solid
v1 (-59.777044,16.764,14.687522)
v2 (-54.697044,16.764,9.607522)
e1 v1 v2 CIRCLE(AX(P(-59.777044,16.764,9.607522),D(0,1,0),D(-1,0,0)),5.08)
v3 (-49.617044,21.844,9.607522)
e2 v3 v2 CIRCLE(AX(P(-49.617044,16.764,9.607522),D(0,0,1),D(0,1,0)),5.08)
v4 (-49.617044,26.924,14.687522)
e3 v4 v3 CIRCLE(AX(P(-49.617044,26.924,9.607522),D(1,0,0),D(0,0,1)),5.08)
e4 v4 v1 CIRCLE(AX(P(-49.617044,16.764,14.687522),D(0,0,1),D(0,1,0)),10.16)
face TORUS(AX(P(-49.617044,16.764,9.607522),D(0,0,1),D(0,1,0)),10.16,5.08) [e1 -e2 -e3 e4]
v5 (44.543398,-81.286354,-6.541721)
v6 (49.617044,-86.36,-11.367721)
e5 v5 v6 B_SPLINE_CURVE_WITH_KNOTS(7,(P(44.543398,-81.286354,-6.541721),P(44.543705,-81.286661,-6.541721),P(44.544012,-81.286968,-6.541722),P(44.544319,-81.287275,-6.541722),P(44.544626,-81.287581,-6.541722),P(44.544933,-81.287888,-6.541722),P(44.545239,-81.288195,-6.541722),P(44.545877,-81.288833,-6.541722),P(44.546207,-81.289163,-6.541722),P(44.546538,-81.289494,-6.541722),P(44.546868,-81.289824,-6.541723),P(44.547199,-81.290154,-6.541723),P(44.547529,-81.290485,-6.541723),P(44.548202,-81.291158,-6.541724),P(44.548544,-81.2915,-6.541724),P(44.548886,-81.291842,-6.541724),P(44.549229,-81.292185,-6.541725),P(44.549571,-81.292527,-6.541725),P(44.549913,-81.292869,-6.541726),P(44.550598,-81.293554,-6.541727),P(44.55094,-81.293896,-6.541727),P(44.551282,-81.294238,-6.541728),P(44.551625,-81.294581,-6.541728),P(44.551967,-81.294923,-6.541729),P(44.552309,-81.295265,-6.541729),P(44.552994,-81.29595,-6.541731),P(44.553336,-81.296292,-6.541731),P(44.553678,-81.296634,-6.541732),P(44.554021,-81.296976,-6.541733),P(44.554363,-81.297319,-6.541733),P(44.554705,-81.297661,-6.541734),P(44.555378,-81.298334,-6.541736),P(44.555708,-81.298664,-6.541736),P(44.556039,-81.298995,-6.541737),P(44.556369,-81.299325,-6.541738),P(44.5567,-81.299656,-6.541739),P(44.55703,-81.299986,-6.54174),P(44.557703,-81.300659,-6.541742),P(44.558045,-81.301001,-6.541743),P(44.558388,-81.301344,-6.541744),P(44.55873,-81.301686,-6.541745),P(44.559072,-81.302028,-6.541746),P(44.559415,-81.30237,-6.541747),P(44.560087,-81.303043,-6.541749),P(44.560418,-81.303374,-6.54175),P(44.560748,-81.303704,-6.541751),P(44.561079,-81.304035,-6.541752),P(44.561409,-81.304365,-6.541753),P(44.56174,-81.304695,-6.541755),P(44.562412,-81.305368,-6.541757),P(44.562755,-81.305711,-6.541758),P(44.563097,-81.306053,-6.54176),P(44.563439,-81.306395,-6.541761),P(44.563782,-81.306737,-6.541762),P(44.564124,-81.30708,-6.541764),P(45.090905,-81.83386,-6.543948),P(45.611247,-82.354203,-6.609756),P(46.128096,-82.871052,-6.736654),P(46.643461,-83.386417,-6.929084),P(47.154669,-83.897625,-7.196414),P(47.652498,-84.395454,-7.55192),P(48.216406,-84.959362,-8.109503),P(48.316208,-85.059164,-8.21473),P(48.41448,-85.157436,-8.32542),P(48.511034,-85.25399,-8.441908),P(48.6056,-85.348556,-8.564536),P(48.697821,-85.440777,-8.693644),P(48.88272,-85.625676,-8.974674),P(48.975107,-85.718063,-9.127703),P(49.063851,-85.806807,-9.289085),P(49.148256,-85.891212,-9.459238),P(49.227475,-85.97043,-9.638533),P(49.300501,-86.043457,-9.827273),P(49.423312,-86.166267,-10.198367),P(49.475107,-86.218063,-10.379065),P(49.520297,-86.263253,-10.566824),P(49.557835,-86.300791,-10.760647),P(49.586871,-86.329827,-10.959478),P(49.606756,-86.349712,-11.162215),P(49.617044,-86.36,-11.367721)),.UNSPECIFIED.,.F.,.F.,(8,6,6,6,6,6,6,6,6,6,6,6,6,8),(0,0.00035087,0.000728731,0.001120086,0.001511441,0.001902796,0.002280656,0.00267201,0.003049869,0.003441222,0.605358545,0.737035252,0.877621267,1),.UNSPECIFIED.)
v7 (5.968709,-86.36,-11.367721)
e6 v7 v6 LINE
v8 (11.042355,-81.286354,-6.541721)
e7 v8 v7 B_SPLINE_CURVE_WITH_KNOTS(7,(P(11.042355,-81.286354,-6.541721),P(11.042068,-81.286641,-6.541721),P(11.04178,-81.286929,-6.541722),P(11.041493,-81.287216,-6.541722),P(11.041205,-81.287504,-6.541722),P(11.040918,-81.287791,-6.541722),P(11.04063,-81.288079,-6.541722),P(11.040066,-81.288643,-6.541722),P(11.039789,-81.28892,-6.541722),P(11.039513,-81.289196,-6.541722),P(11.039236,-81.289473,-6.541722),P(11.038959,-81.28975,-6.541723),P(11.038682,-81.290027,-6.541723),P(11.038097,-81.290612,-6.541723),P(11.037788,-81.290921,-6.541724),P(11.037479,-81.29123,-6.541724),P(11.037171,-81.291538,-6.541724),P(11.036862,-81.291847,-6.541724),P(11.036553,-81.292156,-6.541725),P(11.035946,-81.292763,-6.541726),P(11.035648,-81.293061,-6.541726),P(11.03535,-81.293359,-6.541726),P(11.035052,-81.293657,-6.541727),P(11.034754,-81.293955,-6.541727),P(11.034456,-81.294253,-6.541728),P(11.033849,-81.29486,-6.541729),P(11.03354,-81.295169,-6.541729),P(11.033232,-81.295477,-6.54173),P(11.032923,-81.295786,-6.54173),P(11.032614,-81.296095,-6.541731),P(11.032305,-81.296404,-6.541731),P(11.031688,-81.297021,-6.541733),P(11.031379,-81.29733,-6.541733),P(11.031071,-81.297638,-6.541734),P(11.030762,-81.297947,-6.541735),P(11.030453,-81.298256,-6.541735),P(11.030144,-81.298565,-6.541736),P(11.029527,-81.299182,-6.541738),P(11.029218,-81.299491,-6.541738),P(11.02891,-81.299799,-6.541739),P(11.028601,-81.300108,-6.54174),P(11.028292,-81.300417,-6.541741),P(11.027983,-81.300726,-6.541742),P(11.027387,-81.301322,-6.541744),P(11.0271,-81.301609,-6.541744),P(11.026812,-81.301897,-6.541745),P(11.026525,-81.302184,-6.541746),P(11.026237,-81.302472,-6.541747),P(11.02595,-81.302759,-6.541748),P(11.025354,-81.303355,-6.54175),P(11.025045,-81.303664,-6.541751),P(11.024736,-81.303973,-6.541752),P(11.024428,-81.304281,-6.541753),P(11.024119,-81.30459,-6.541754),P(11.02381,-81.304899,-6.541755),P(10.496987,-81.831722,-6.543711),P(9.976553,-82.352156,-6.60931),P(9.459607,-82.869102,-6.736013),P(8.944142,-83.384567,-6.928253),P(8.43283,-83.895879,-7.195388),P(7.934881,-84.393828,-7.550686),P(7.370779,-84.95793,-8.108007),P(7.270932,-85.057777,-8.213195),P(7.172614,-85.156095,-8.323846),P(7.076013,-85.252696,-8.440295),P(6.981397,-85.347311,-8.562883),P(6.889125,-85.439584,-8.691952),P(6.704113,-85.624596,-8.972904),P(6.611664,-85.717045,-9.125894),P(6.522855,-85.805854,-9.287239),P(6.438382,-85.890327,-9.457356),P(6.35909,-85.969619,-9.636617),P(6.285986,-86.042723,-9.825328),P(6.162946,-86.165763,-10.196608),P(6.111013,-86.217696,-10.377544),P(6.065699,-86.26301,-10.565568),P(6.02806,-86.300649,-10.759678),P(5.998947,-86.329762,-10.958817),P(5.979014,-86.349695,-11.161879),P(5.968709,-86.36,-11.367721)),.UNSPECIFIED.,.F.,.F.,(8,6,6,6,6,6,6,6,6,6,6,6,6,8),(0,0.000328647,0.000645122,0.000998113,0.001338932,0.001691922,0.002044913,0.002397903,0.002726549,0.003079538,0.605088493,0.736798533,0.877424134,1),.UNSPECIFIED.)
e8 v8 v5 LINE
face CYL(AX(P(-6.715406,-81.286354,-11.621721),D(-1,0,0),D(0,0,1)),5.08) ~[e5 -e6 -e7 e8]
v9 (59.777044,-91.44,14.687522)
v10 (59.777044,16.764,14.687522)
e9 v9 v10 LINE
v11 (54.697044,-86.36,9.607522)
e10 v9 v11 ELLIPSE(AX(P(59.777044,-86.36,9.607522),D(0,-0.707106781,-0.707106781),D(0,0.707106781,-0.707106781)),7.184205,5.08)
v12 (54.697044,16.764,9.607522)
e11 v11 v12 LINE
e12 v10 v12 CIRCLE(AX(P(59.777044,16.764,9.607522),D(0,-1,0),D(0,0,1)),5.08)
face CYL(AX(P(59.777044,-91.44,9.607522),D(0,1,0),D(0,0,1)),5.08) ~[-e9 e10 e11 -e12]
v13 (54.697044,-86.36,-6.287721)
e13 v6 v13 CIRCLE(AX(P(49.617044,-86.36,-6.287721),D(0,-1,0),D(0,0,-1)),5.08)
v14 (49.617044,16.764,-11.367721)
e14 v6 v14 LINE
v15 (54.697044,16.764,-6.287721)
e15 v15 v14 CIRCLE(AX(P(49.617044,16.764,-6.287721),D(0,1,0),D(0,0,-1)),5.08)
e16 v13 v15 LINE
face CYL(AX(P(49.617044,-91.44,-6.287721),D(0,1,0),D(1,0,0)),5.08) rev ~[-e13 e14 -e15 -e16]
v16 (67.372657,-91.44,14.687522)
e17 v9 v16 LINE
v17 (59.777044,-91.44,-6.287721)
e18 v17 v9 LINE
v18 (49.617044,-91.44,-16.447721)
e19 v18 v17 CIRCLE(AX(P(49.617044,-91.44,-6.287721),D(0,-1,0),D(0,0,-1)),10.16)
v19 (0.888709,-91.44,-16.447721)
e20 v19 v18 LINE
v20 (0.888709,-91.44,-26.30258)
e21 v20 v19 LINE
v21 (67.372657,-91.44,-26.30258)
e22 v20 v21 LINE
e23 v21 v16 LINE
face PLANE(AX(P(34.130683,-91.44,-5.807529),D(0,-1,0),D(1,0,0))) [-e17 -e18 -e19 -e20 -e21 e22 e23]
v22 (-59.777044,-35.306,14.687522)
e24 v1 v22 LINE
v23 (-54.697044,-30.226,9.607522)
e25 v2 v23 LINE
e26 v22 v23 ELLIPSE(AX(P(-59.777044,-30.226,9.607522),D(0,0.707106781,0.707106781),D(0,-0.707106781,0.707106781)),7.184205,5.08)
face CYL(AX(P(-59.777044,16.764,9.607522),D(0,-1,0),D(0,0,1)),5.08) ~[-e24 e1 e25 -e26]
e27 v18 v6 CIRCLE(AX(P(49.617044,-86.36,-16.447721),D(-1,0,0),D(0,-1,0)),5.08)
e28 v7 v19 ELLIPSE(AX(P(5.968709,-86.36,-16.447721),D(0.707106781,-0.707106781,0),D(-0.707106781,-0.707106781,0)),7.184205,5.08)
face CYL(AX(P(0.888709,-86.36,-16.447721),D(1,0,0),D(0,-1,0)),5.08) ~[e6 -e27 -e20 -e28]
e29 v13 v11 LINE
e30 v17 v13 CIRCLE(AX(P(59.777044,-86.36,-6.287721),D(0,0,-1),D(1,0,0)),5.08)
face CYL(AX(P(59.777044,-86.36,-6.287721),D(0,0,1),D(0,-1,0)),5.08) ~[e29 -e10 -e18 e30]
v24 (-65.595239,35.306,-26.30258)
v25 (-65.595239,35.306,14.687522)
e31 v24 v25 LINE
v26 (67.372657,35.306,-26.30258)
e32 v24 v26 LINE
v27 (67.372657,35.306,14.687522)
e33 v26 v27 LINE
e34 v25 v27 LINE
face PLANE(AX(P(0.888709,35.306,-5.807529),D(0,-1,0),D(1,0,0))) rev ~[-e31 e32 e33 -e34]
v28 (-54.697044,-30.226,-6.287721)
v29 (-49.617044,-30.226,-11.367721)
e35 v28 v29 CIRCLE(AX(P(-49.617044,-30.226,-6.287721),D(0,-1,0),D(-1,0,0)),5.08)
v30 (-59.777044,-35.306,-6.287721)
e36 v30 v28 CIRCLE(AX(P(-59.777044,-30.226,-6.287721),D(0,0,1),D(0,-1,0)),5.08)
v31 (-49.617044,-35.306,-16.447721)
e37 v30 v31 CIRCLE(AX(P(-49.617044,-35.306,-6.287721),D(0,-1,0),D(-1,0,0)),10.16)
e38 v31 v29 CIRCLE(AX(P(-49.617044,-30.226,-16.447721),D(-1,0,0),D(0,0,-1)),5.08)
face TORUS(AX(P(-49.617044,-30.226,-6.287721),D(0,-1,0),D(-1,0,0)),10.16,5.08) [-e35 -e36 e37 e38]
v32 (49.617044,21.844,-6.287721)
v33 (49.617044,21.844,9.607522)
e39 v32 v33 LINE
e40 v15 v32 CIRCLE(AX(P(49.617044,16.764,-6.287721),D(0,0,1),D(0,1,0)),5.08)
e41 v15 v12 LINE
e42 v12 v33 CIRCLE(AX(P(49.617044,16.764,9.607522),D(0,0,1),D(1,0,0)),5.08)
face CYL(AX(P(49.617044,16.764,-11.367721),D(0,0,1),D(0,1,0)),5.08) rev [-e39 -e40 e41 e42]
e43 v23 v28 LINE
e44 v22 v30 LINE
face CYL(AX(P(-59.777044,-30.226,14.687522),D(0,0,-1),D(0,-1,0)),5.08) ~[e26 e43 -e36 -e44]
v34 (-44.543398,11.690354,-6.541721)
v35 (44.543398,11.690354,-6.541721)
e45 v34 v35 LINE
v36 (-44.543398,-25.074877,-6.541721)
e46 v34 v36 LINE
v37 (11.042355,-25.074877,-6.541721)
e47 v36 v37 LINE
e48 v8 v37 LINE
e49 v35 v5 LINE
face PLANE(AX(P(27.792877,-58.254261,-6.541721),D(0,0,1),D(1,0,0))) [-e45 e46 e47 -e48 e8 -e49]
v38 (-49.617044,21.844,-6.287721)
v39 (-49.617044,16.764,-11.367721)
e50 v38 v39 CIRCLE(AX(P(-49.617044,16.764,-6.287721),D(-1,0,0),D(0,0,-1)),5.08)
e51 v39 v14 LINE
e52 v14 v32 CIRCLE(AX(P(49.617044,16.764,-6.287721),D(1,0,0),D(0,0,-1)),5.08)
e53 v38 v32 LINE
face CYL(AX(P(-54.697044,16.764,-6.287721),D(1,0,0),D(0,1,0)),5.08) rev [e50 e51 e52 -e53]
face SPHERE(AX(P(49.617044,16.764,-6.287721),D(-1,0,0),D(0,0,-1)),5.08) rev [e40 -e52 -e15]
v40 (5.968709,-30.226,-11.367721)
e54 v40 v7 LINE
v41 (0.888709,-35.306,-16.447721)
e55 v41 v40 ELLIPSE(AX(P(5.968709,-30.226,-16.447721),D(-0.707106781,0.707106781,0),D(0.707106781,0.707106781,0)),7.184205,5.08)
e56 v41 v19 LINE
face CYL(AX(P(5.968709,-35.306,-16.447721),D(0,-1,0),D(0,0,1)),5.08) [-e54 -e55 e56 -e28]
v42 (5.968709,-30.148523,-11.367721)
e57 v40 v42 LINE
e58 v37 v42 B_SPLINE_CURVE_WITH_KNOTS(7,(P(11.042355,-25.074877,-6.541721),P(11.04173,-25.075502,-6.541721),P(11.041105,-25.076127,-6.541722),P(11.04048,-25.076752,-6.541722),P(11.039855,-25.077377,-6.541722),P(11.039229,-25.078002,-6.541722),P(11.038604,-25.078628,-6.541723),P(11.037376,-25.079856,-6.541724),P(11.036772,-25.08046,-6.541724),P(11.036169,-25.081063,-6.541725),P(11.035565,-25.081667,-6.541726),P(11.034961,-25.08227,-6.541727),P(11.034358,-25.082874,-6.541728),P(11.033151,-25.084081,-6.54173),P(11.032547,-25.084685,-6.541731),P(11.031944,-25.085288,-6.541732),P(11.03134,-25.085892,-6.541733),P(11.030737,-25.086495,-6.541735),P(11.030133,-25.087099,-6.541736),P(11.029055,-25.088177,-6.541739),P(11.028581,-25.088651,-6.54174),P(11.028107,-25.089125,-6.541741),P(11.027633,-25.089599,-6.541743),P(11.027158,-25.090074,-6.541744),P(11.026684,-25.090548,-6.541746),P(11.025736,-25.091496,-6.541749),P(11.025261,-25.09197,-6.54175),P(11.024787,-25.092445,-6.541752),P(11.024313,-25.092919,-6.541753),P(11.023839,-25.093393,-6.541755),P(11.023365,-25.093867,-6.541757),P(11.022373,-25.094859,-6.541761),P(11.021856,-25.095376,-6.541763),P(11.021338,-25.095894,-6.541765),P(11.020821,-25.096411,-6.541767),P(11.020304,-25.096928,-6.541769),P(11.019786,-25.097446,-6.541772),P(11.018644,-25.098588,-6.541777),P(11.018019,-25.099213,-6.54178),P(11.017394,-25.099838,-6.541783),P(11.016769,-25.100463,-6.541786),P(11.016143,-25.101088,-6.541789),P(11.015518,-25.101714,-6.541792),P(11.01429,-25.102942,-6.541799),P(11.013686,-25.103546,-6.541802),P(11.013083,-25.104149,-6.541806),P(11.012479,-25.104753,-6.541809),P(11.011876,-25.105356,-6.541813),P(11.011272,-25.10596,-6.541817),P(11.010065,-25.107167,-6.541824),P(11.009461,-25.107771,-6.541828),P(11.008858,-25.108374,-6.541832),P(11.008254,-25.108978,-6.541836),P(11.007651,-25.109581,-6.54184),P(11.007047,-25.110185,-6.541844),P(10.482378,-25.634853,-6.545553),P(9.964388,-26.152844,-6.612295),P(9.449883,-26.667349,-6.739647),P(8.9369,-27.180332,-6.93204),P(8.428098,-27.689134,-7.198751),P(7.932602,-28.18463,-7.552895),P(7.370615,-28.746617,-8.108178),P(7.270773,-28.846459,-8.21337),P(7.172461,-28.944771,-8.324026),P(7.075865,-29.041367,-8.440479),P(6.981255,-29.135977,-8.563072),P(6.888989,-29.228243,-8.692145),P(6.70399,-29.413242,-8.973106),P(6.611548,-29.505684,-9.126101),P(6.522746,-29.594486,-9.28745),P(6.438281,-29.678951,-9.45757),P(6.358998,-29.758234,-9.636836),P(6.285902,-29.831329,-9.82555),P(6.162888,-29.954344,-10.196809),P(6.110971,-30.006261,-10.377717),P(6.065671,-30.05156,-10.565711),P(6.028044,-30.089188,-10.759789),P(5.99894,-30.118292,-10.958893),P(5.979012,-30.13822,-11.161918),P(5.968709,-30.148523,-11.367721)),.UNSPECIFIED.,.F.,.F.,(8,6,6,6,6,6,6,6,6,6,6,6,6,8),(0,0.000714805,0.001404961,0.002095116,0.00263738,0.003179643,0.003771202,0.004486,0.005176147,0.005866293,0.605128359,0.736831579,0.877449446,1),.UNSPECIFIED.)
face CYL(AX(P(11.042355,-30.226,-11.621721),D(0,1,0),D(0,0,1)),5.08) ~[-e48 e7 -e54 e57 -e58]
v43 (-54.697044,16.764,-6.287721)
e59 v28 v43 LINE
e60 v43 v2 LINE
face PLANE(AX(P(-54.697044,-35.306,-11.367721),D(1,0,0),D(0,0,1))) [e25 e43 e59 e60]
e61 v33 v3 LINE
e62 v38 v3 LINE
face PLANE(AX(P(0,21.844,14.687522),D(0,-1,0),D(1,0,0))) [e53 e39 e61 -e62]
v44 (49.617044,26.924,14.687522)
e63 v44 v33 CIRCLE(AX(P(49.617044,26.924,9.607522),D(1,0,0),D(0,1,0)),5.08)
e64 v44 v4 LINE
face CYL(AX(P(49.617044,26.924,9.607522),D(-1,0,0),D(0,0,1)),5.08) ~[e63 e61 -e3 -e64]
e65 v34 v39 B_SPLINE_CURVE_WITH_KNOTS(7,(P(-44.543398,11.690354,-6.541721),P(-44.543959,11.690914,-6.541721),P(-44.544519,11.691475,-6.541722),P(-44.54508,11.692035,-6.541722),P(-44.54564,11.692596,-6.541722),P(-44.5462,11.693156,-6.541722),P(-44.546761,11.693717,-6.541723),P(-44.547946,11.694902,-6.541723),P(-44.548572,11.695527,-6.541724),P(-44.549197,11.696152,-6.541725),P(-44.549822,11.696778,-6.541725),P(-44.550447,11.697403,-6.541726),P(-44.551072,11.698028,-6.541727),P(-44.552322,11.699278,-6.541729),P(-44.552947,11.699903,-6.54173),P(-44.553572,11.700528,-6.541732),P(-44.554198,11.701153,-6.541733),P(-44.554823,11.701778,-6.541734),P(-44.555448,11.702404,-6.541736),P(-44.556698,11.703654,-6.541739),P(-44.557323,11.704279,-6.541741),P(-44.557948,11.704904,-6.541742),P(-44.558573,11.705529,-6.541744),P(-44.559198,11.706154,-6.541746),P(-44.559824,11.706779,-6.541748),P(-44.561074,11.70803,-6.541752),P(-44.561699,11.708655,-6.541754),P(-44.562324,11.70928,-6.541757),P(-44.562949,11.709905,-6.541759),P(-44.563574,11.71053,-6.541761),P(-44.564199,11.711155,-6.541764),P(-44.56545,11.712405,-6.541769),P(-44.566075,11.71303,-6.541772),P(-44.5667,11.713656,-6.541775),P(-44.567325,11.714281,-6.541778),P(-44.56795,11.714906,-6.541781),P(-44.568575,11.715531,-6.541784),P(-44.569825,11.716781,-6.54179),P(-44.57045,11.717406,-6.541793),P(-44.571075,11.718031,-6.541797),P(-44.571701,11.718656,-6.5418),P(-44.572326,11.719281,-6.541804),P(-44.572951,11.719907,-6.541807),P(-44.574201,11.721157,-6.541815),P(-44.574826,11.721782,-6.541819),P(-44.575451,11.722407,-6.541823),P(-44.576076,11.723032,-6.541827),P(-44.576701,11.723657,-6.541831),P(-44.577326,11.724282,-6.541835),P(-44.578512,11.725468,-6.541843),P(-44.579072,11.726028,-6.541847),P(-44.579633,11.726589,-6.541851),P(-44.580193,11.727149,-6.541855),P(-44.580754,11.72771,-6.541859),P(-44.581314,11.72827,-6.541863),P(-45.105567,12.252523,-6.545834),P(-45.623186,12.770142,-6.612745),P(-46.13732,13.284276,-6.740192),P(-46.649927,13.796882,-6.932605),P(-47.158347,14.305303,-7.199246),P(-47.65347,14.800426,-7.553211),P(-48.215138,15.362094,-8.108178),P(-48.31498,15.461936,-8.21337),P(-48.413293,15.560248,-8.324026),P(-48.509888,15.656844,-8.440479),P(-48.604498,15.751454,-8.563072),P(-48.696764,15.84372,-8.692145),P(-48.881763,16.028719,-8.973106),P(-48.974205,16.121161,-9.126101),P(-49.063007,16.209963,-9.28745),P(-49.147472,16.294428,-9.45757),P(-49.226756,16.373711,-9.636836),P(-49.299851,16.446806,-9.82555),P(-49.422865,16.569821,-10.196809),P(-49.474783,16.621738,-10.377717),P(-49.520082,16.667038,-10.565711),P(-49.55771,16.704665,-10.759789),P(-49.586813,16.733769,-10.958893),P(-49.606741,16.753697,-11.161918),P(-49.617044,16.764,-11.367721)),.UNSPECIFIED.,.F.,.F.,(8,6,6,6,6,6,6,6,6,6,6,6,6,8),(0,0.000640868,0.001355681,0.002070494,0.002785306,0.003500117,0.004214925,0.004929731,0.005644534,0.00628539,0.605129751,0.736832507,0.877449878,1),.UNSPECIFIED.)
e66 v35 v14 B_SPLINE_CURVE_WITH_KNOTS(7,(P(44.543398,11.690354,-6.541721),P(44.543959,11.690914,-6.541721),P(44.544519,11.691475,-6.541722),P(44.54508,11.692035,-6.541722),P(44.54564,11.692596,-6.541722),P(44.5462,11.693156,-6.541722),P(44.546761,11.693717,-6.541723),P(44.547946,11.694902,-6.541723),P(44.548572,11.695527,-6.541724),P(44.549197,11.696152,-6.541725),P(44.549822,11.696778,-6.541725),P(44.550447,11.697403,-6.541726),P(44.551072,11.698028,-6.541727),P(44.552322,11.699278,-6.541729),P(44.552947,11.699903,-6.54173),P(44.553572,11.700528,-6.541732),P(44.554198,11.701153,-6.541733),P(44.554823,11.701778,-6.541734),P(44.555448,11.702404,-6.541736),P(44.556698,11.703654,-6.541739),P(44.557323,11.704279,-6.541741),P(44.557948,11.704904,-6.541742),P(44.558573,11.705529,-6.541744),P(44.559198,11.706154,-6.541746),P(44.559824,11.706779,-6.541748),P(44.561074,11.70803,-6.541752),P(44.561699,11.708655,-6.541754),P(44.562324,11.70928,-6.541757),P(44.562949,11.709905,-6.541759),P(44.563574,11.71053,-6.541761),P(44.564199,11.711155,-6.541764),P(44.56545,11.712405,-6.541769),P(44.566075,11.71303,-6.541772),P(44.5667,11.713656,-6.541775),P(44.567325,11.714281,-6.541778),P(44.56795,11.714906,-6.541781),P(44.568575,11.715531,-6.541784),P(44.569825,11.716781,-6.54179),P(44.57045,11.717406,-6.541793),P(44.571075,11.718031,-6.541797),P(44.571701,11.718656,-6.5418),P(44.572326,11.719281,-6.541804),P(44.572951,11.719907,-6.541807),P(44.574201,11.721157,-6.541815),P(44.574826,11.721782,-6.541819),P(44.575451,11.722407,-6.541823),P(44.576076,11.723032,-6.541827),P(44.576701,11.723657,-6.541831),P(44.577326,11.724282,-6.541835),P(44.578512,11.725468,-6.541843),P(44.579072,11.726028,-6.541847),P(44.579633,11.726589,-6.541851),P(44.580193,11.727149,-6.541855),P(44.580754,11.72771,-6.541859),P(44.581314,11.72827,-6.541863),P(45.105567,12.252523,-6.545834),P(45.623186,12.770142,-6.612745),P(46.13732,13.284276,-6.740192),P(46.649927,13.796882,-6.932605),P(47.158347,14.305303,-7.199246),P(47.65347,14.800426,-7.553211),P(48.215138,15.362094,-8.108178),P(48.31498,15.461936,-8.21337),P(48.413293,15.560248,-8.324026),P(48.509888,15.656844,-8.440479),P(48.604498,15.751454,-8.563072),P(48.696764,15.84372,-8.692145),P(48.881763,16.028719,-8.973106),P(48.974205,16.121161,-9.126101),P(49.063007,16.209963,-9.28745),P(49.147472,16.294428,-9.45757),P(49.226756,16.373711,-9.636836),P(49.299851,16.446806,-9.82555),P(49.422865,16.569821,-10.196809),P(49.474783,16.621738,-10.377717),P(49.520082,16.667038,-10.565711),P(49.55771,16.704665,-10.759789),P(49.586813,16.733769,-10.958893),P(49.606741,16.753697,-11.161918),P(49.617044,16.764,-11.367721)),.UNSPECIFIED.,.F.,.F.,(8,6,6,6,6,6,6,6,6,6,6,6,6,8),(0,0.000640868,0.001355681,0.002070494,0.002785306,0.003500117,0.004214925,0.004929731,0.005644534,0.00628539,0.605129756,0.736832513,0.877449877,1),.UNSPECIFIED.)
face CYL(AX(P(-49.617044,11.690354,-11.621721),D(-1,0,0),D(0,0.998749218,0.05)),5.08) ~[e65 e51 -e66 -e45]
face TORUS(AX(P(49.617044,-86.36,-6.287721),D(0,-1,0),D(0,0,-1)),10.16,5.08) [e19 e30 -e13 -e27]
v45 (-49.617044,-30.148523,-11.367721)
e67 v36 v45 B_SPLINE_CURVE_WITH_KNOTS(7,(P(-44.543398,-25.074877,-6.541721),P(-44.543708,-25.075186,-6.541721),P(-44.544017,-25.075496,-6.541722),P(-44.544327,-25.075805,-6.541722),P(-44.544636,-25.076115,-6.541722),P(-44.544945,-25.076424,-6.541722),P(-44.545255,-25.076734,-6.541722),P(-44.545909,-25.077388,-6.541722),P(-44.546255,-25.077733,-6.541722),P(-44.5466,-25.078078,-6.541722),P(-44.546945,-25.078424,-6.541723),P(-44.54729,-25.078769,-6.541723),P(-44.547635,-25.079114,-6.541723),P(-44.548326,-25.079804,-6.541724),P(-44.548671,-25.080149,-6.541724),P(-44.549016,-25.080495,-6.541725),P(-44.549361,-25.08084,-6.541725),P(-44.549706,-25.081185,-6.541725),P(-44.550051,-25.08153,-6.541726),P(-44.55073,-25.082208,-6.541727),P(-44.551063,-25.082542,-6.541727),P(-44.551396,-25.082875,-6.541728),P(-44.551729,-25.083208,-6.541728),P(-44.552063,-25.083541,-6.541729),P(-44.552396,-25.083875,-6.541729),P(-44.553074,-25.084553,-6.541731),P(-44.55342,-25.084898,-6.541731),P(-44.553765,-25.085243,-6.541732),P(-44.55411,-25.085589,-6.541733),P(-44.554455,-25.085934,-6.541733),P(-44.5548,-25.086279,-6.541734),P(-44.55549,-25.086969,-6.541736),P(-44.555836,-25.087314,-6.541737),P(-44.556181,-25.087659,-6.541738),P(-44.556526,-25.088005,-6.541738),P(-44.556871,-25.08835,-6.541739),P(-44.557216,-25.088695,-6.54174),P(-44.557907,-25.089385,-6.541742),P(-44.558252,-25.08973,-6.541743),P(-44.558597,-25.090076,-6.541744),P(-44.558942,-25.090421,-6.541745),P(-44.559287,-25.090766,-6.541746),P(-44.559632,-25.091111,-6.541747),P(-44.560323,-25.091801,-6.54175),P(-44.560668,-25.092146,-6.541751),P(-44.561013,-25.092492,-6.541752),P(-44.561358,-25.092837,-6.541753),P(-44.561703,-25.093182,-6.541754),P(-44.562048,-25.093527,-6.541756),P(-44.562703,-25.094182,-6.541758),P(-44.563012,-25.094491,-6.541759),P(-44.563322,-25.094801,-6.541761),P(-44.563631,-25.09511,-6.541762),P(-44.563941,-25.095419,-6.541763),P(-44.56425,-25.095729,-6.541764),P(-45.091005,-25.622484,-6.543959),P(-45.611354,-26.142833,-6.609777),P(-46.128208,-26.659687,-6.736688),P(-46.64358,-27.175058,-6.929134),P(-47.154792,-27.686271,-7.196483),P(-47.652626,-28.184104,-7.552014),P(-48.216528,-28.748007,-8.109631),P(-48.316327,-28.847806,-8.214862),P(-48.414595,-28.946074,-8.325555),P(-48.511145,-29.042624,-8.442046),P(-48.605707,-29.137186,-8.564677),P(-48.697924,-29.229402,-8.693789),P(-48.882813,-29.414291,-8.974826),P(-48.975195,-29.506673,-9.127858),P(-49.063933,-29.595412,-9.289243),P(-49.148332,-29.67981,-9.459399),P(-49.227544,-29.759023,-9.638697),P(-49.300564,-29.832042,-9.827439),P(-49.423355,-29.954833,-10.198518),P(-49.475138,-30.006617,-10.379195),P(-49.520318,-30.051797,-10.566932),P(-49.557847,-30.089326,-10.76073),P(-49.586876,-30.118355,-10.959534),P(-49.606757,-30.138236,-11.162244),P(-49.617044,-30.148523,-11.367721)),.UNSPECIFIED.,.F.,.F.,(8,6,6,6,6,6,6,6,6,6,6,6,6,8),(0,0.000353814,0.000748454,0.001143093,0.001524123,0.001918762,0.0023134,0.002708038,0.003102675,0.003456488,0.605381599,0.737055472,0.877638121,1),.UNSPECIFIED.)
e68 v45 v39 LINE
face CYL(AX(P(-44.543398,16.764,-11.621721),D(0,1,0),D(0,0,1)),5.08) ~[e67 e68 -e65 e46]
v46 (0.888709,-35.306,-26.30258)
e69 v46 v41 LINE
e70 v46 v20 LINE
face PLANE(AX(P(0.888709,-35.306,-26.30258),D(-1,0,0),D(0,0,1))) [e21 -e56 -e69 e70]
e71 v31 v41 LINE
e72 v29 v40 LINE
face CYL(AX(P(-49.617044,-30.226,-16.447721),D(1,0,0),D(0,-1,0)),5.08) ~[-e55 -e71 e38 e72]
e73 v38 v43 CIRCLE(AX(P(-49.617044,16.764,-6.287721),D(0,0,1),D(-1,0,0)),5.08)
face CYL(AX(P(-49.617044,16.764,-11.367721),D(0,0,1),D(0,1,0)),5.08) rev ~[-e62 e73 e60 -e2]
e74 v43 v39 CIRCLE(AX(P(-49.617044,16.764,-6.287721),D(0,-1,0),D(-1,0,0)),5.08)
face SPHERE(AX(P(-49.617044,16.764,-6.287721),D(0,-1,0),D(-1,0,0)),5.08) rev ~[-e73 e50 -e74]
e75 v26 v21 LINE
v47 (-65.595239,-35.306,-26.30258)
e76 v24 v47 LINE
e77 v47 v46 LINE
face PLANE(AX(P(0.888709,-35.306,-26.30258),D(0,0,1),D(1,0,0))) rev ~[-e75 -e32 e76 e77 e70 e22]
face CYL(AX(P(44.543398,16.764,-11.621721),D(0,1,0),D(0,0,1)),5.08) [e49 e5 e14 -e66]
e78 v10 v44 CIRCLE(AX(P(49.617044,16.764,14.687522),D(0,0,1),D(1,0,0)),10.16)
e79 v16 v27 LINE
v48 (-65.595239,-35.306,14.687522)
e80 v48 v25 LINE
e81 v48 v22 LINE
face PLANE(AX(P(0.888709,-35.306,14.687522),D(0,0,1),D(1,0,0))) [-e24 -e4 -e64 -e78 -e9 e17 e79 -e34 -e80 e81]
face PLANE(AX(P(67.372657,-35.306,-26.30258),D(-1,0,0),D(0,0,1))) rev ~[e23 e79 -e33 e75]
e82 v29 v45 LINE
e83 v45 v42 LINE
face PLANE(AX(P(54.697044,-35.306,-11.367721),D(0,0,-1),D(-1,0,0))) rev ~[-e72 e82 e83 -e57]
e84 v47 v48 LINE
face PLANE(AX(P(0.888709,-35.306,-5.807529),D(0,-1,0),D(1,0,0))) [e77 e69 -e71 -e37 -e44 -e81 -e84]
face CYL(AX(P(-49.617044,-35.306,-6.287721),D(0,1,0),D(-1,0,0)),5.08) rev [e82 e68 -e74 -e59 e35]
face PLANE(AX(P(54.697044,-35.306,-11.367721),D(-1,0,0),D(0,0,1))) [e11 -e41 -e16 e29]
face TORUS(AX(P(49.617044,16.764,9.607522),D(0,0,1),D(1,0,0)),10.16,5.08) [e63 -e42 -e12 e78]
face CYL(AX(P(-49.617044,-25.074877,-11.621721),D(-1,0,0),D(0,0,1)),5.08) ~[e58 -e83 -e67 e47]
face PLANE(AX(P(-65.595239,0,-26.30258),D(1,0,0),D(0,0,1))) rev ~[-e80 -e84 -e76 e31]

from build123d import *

# Parameters (mm, degrees)
F0_W          = 132.9678967595
F0_H          = 40.9901021048
F1_DEPTH      = 35.306
F2_W          = 109.3940883875
F2_H          = 52.1104875952
F3_DEPTH      = 57.15
F4_W          = 66.4839483798
F4_H          = 40.9901021048
F5_DEPTH      = 56.134
F6_W          = 53.8083352149
F6_H          = 26.0552437976
F7_DEPTH      = 59.69
F8_F1_R       = 5.08
F8_F2_R       = 5.08
F9_W          = 99.2340883875
F9_H          = 46.9125229284
F10_DEPTH     = 4.826
F11_W         = 43.6483352149
F11_H         = 56.2114770716
F12_DEPTH     = 4.826
F13_T1_DEPTH  = 56.3324502806
F13_T3_DEPTH  = 0.0774771487
F13_T5_DEPTH  = 68.8181149887
F13_T7_DEPTH  = 55.5857531726
F13_T9_DEPTH  = 115.8081150657
F13_T11_DEPTH = 99.2340883875
F13_T13_DEPTH = 59.5966379941
F13_T19_DEPTH = 68.2698682383
F13_T23_DEPTH = 12.7615922144


# Not quite as in the source:
# - a fillet or chamfer that OpenCascade refuses, or shapes differently, is made with other operations: its cross-section is extruded or revolved along the edge and cut away or added


with BuildPart() as f1:
    # F0 (on Front) → F1 (new body, symmetric)
    with BuildSketch(Plane.XZ):
        with Locations((0.8887089789, -5.8075287379)):
            Rectangle(F0_W, F0_H)
    extrude(amount=F1_DEPTH, both=True)

    # F2 (on face) → F3 (cut)
    with BuildSketch(Plane.XZ.offset(35.306)):
        with Locations((0, 14.6875223145)):
            Rectangle(F2_W, F2_H)
    extrude(amount=-F3_DEPTH, mode=Mode.SUBTRACT)

    # F4 (on face) → F5 (join)
    with BuildSketch(Plane.XZ.offset(35.306)):
        with Locations((34.1306831688, -5.8075287379)):
            Rectangle(F4_W, F4_H)
    extrude(amount=F5_DEPTH)

    # F6 (on face) → F7 (cut)
    with BuildSketch(Plane(origin=(0, -35.306, 0), x_dir=(-1, 0, 0), z_dir=(0, 1, 0))):
        with Locations((-27.7928765863, 1.6599004157)):
            Rectangle(F6_W, F6_H)
    extrude(amount=-F7_DEPTH, mode=Mode.SUBTRACT)

    # F8: fillet of radius 5.08 on 11 edges, made by hand

    # F8_f1
    f8_f1_edges = [f1.edges().sort_by_distance(p)[0] for p in [
        (-54.6970441937, -6.731, -11.3677214831),
        (-54.6970441937, 21.844, 1.6599004157),
        (0, 21.844, -11.3677214831),
        (54.6970441937, -34.798, -11.3677214831),
        (54.6970441937, 21.844, 1.6599004157),
    ]]
    fillet(f8_f1_edges, radius=F8_F1_R)

    # F8_f2
    f8_f2_edges = [f1.edges().sort_by_distance(p)[0] for p in [
        (-54.6970441937, -9.271, 14.6875223145),
        (0, 21.844, 14.6875223145),
        (54.6970441937, -37.338, 14.6875223145),
        (-24.3641676074, -35.306, -11.3677214831),
        (0.8887089789, -63.373, -11.3677214831),
        (25.2528765863, -91.44, -11.3677214831),
        (53.2091466422, -91.44, -9.8798239315),
        (-53.2091466422, -35.306, -9.8798239315),
        (53.2091466422, 20.3561024484, 14.6875223145),
        (-53.2091466422, 20.3561024484, 14.6875223145),
    ]]
    fillet(f8_f2_edges, radius=F8_F2_R)

    # F9 (on face) → F10 (join)
    with BuildSketch(Plane.XY.offset(-11.3677214831)):
        with Locations((0, -6.6922614642)):
            Rectangle(F9_W, F9_H)
    extrude(amount=F10_DEPTH)

    # F11 (on face) → F12 (join)
    with BuildSketch(Plane.XY.offset(-11.3677214831)):
        with Locations((27.7928765863, -58.2542614642)):
            Rectangle(F11_W, F11_H)
    extrude(amount=F12_DEPTH)

    # F13: fillet of radius 5.08 on 6 edges, made by hand

    # F13_s2 → F13_t1 (cut)
    with BuildSketch(Plane.YZ.offset(-6.7154060868)):
        with BuildLine():
            ThreePointArc((-81.2863539737, -6.5417214831), (-84.7875023567, -7.9409117896), (-86.36, -11.3677214831))
            Line((-86.36, -11.3677214831), (-86.36, -6.5417214831))
            Line((-86.36, -6.5417214831), (-81.2863539737, -6.5417214831))
        make_face()
    extrude(amount=F13_T1_DEPTH, mode=Mode.SUBTRACT)

    # F13_s4 → F13_t3 (cut)
    with BuildSketch(Plane.XZ.offset(30.1485229284)):
        with BuildLine():
            ThreePointArc((11.0423550052, -6.5417214831), (7.5412066221, -7.9409117896), (5.9687089789, -11.3677214831))
            Line((5.9687089789, -11.3677214831), (5.9687089789, -6.5417214831))
            Line((5.9687089789, -6.5417214831), (11.0423550052, -6.5417214831))
        make_face()
    extrude(amount=F13_T3_DEPTH, mode=Mode.SUBTRACT)

    # F13_s6 → F13_t5 (cut)
    with BuildSketch(Plane.XZ.offset(30.226000077)):
        with BuildLine():
            ThreePointArc((11.0423550052, -6.5417214831), (7.5412066221, -7.9409117896), (5.9687089789, -11.3677214831))
            Line((5.9687089789, -11.3677214831), (5.9687089789, -6.5417214831))
            Line((5.9687089789, -6.5417214831), (11.0423550052, -6.5417214831))
        make_face()
    extrude(amount=F13_T5_DEPTH, mode=Mode.SUBTRACT)

    # F13_s8 → F13_t7 (cut)
    with BuildSketch(Plane.YZ.offset(-49.6170441937)):
        with BuildLine():
            ThreePointArc((-25.0748769021, -6.5417214831), (-28.5760252851, -7.9409117896), (-30.1485229284, -11.3677214831))
            Line((-30.1485229284, -11.3677214831), (-30.1485229284, -6.5417214831))
            Line((-30.1485229284, -6.5417214831), (-25.0748769021, -6.5417214831))
        make_face()
    extrude(amount=F13_T7_DEPTH, mode=Mode.SUBTRACT)

    # F13_s10 → F13_t9 (cut)
    with BuildSketch(Plane.XZ.offset(-16.764)):
        with BuildLine():
            ThreePointArc((44.5433981675, -6.5417214831), (48.0445465505, -7.9409117896), (49.6170441937, -11.3677214831))
            Line((49.6170441937, -11.3677214831), (49.6170441937, -6.5417214831))
            Line((49.6170441937, -6.5417214831), (44.5433981675, -6.5417214831))
        make_face()
    extrude(amount=F13_T9_DEPTH, mode=Mode.SUBTRACT)

    # F13_s12 → F13_t11 (cut)
    with BuildSketch(Plane.YZ.offset(-49.6170441937)):
        with BuildLine():
            ThreePointArc((16.764, -11.3677214831), (15.1915023567, -7.9409117896), (11.6903539737, -6.5417214831))
            Line((11.6903539737, -6.5417214831), (16.764, -6.5417214831))
            Line((16.764, -6.5417214831), (16.764, -11.3677214831))
        make_face()
    extrude(amount=F13_T11_DEPTH, mode=Mode.SUBTRACT)

    # F13_s14 → F13_t13 (cut)
    with BuildSketch(Plane.XZ.offset(-16.764)):
        with BuildLine():
            ThreePointArc((-44.5433981675, -6.5417214831), (-48.0445465505, -7.9409117896), (-49.6170441937, -11.3677214831))
            Line((-49.6170441937, -11.3677214831), (-49.6170441937, -6.5417214831))
            Line((-49.6170441937, -6.5417214831), (-44.5433981675, -6.5417214831))
        make_face()
    extrude(amount=F13_T13_DEPTH, mode=Mode.SUBTRACT)


with BuildPart() as f13_tool17:
    # F13_s18 → F13_t19 (new body)
    with BuildSketch(Plane.YZ.offset(-49.6170441937)):
        with BuildLine():
            ThreePointArc((-25.0748769021, -6.5417214831), (-28.5760252851, -7.9409117896), (-30.1485229284, -11.3677214831))
            Line((-30.1485229284, -11.3677214831), (-30.1485229284, -6.5417214831))
            Line((-30.1485229284, -6.5417214831), (-25.0748769021, -6.5417214831))
        make_face()
    extrude(amount=F13_T19_DEPTH)

    split(bisect_by=Plane.YZ.offset(5.9687089789), keep=Keep.TOP)


with BuildPart() as f13_tool21:
    # F13_s22 → F13_t23 (new body)
    with BuildSketch(Plane.XZ.offset(17.4644078627)):
        with BuildLine():
            ThreePointArc((11.0423550052, -6.5417214831), (7.5412066221, -7.9409117896), (5.9687089789, -11.3677214831))
            Line((5.9687089789, -11.3677214831), (5.9687089789, -6.5417214831))
            Line((5.9687089789, -6.5417214831), (11.0423550052, -6.5417214831))
        make_face()
    extrude(amount=F13_T23_DEPTH)

    split(bisect_by=Plane.XZ.offset(30.1485229284), keep=Keep.BOTTOM)


with BuildPart() as f13_tool17_1:
    add(f13_tool17.part)

    # F13_t25: intersect F13_tool21
    add(f13_tool21.part, mode=Mode.INTERSECT)


with BuildPart() as f1_1:
    add(f1.part)

    # F13_t15: cut F13_tool17
    add(f13_tool17_1.part, mode=Mode.SUBTRACT)


solid = f1_1.part
